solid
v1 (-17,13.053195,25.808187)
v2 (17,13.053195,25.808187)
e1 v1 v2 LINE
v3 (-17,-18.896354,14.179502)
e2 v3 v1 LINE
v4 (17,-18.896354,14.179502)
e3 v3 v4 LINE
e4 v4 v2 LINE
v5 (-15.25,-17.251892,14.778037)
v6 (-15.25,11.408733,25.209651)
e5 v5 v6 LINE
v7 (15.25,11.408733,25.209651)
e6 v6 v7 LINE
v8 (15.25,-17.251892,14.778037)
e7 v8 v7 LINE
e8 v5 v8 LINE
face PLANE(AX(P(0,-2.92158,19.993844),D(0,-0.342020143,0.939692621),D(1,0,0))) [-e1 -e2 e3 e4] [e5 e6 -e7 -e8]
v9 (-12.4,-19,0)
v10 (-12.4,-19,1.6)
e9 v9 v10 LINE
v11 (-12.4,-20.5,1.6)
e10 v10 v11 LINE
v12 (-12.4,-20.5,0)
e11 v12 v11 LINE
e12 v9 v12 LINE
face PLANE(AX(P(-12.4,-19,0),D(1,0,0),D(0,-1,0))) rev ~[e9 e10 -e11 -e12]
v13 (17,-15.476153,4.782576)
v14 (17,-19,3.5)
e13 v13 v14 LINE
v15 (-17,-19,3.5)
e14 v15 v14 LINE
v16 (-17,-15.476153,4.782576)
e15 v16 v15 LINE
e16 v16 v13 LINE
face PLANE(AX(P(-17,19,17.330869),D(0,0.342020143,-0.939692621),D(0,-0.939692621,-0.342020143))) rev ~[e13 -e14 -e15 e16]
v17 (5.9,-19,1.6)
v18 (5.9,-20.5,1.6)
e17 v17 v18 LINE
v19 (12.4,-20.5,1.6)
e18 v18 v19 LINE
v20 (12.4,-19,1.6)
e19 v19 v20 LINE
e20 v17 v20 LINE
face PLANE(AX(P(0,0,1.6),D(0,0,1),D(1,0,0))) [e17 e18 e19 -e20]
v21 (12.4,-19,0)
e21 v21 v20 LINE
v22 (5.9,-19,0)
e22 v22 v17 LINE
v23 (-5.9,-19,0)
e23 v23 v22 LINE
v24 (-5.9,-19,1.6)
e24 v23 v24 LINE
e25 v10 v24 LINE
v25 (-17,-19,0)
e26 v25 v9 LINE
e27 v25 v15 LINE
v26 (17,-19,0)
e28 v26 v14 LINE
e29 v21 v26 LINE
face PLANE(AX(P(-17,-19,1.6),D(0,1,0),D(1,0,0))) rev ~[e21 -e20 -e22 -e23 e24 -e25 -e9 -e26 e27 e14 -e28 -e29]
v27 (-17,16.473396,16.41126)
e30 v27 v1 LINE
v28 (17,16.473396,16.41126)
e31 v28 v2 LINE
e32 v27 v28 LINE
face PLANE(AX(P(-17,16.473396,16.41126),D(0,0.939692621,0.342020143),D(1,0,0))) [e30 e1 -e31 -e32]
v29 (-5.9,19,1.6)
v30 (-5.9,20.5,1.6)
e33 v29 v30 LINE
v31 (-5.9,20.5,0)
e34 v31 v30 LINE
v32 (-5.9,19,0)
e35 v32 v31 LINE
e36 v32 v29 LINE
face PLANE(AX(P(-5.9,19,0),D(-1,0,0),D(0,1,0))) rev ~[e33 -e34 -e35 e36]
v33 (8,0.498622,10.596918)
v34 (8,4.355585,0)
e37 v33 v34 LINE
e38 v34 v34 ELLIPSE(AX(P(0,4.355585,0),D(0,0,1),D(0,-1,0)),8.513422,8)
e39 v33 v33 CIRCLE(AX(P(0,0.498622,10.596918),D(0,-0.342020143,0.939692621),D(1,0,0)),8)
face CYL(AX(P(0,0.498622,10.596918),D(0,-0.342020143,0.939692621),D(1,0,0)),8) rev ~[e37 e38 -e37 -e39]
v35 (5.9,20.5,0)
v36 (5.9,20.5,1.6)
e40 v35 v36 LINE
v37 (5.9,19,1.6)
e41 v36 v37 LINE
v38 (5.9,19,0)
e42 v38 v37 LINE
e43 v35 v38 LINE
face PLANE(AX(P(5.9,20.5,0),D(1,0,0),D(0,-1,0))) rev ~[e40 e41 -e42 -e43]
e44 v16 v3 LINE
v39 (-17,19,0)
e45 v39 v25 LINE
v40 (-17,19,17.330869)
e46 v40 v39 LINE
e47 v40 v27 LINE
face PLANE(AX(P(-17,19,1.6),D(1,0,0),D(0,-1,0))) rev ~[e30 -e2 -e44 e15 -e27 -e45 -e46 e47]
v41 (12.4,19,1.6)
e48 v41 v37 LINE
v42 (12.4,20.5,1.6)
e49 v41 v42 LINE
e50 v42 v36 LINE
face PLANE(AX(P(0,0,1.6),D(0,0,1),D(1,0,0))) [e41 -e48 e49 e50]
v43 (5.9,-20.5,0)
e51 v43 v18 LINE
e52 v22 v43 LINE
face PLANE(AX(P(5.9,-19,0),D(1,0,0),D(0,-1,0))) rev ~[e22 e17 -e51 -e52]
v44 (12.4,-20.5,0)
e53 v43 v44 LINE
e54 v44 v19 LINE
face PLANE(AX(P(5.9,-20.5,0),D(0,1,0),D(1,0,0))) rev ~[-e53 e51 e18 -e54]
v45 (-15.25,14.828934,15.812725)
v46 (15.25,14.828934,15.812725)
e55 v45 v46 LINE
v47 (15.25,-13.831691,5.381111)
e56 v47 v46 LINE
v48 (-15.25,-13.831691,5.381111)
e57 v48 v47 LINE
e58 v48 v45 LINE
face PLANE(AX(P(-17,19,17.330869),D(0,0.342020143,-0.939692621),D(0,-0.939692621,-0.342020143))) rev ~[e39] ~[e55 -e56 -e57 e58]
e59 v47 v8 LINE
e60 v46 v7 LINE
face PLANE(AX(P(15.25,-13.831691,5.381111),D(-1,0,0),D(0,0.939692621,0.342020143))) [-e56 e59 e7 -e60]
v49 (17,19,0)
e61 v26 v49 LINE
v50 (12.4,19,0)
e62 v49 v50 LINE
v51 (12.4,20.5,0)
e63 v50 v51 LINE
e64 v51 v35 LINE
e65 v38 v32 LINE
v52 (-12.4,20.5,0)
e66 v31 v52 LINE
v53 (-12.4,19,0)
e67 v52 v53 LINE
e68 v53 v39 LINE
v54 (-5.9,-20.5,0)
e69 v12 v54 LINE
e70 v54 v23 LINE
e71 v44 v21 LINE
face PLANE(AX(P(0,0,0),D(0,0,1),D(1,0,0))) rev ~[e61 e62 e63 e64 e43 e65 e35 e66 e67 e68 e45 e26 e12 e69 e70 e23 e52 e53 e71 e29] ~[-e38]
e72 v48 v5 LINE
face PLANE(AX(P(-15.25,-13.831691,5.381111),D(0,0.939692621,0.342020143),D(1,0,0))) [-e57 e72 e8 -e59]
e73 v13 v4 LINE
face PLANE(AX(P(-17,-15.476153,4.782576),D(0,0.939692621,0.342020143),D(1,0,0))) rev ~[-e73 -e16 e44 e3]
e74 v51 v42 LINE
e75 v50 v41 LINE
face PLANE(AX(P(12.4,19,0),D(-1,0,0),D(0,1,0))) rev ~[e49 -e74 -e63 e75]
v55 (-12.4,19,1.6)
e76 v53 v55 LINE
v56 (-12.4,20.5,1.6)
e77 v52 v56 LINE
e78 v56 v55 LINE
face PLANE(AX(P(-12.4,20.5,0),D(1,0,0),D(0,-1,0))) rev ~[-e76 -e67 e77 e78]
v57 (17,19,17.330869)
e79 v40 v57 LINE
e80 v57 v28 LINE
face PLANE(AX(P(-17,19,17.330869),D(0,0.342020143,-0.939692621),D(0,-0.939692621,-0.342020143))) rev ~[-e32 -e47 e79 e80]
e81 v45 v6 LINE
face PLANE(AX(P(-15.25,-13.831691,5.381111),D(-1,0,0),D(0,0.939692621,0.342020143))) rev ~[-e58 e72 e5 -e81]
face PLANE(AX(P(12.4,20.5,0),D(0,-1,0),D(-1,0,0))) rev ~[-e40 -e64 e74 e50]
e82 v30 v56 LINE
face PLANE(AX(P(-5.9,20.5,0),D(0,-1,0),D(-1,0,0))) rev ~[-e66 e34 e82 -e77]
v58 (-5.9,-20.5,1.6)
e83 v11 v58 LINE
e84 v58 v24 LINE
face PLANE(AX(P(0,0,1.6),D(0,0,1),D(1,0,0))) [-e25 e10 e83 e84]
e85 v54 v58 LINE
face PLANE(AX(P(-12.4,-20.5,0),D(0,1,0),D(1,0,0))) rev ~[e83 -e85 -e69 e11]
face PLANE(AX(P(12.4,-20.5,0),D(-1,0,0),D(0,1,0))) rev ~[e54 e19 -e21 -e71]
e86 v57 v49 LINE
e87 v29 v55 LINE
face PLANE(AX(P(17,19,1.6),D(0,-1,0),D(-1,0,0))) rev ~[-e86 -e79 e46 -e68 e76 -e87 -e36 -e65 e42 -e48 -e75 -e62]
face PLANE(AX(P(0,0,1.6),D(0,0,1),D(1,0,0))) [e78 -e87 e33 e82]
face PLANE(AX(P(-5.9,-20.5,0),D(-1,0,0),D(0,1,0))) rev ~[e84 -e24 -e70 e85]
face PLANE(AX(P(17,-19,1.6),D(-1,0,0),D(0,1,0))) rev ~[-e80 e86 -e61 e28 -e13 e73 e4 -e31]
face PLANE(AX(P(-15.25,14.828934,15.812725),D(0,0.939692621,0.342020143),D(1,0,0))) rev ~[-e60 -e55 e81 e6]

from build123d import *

# Parameters (mm, degrees)
F1_DEPTH = 1.6
F3_DEPTH = 20
F5_DEPTH = 34.001
F6_W     = 34
F6_H     = 34
F6_W_2   = 30.5
F6_H_2   = 30.5
F7_DEPTH = 10
F6_R     = 8
F8_DEPTH = 16.7997198341


# Not quite as in the source:
# - a feature names something its author has since deleted; it is built from what else it names


with BuildPart() as f1:
    # F0 (on Top) → F1 (new body)
    with BuildSketch(Plane.XY):
        Polygon((-12.4, 19), (-17, 19), (-17, -19), (-12.4, -19), (-12.4, -20.5), (-5.9, -20.5), (-5.9, -19), (5.9, -19), (5.9, -20.5), (12.4, -20.5), (12.4, -19), (17, -19), (17, 19), (12.4, 19), (12.4, 20.5), (5.9, 20.5), (5.9, 19), (-5.9, 19), (-5.9, 20.5), (-12.4, 20.5), align=None)
    extrude(amount=F1_DEPTH)

    # F2 (on face) → F3 (join)
    with BuildSketch(Plane.XY.offset(1.6)):
        Polygon((-12.4, 19), (-17, 19), (-17, -19), (-12.4, -19), (-5.9, -19), (5.9, -19), (12.4, -19), (17, -19), (17, 19), (12.4, 19), (5.9, 19), (-5.9, 19), align=None)
    extrude(amount=F3_DEPTH)

    # F4 (on face) → F5 (cut, through all)
    with BuildSketch(Plane(origin=(-17, 0, 0), x_dir=(0, -1, 0), z_dir=(-1, 0, 0))):
        Polygon((-19, 17.3308689021), (19, 3.5), (19, 21.6), (-19, 21.6), align=None)
    extrude(amount=-F5_DEPTH, mode=Mode.SUBTRACT)

    # F6 (on face) → F7 (join)
    with BuildSketch(Plane(origin=(0, -3.3474561073, 9.1970600675), x_dir=(1, 0, 0), z_dir=(0, -0.3420201433, 0.9396926208))):
        with Locations((0, 4.0929107067)):
            Rectangle(F6_W, F6_H)
        with Locations((0, 4.0929107067)):
            Rectangle(F6_W_2, F6_H_2, mode=Mode.SUBTRACT)
    extrude(amount=F7_DEPTH)

    # F6 (on face) → F8 (cut, through all)
    with BuildSketch(Plane(origin=(0, -3.3474561073, 9.1970600675), x_dir=(1, 0, 0), z_dir=(0, -0.3420201433, 0.9396926208))):
        with Locations((0, 4.0929107067)):
            Circle(F6_R)
    extrude(amount=-F8_DEPTH, mode=Mode.SUBTRACT)


solid = f1.part
